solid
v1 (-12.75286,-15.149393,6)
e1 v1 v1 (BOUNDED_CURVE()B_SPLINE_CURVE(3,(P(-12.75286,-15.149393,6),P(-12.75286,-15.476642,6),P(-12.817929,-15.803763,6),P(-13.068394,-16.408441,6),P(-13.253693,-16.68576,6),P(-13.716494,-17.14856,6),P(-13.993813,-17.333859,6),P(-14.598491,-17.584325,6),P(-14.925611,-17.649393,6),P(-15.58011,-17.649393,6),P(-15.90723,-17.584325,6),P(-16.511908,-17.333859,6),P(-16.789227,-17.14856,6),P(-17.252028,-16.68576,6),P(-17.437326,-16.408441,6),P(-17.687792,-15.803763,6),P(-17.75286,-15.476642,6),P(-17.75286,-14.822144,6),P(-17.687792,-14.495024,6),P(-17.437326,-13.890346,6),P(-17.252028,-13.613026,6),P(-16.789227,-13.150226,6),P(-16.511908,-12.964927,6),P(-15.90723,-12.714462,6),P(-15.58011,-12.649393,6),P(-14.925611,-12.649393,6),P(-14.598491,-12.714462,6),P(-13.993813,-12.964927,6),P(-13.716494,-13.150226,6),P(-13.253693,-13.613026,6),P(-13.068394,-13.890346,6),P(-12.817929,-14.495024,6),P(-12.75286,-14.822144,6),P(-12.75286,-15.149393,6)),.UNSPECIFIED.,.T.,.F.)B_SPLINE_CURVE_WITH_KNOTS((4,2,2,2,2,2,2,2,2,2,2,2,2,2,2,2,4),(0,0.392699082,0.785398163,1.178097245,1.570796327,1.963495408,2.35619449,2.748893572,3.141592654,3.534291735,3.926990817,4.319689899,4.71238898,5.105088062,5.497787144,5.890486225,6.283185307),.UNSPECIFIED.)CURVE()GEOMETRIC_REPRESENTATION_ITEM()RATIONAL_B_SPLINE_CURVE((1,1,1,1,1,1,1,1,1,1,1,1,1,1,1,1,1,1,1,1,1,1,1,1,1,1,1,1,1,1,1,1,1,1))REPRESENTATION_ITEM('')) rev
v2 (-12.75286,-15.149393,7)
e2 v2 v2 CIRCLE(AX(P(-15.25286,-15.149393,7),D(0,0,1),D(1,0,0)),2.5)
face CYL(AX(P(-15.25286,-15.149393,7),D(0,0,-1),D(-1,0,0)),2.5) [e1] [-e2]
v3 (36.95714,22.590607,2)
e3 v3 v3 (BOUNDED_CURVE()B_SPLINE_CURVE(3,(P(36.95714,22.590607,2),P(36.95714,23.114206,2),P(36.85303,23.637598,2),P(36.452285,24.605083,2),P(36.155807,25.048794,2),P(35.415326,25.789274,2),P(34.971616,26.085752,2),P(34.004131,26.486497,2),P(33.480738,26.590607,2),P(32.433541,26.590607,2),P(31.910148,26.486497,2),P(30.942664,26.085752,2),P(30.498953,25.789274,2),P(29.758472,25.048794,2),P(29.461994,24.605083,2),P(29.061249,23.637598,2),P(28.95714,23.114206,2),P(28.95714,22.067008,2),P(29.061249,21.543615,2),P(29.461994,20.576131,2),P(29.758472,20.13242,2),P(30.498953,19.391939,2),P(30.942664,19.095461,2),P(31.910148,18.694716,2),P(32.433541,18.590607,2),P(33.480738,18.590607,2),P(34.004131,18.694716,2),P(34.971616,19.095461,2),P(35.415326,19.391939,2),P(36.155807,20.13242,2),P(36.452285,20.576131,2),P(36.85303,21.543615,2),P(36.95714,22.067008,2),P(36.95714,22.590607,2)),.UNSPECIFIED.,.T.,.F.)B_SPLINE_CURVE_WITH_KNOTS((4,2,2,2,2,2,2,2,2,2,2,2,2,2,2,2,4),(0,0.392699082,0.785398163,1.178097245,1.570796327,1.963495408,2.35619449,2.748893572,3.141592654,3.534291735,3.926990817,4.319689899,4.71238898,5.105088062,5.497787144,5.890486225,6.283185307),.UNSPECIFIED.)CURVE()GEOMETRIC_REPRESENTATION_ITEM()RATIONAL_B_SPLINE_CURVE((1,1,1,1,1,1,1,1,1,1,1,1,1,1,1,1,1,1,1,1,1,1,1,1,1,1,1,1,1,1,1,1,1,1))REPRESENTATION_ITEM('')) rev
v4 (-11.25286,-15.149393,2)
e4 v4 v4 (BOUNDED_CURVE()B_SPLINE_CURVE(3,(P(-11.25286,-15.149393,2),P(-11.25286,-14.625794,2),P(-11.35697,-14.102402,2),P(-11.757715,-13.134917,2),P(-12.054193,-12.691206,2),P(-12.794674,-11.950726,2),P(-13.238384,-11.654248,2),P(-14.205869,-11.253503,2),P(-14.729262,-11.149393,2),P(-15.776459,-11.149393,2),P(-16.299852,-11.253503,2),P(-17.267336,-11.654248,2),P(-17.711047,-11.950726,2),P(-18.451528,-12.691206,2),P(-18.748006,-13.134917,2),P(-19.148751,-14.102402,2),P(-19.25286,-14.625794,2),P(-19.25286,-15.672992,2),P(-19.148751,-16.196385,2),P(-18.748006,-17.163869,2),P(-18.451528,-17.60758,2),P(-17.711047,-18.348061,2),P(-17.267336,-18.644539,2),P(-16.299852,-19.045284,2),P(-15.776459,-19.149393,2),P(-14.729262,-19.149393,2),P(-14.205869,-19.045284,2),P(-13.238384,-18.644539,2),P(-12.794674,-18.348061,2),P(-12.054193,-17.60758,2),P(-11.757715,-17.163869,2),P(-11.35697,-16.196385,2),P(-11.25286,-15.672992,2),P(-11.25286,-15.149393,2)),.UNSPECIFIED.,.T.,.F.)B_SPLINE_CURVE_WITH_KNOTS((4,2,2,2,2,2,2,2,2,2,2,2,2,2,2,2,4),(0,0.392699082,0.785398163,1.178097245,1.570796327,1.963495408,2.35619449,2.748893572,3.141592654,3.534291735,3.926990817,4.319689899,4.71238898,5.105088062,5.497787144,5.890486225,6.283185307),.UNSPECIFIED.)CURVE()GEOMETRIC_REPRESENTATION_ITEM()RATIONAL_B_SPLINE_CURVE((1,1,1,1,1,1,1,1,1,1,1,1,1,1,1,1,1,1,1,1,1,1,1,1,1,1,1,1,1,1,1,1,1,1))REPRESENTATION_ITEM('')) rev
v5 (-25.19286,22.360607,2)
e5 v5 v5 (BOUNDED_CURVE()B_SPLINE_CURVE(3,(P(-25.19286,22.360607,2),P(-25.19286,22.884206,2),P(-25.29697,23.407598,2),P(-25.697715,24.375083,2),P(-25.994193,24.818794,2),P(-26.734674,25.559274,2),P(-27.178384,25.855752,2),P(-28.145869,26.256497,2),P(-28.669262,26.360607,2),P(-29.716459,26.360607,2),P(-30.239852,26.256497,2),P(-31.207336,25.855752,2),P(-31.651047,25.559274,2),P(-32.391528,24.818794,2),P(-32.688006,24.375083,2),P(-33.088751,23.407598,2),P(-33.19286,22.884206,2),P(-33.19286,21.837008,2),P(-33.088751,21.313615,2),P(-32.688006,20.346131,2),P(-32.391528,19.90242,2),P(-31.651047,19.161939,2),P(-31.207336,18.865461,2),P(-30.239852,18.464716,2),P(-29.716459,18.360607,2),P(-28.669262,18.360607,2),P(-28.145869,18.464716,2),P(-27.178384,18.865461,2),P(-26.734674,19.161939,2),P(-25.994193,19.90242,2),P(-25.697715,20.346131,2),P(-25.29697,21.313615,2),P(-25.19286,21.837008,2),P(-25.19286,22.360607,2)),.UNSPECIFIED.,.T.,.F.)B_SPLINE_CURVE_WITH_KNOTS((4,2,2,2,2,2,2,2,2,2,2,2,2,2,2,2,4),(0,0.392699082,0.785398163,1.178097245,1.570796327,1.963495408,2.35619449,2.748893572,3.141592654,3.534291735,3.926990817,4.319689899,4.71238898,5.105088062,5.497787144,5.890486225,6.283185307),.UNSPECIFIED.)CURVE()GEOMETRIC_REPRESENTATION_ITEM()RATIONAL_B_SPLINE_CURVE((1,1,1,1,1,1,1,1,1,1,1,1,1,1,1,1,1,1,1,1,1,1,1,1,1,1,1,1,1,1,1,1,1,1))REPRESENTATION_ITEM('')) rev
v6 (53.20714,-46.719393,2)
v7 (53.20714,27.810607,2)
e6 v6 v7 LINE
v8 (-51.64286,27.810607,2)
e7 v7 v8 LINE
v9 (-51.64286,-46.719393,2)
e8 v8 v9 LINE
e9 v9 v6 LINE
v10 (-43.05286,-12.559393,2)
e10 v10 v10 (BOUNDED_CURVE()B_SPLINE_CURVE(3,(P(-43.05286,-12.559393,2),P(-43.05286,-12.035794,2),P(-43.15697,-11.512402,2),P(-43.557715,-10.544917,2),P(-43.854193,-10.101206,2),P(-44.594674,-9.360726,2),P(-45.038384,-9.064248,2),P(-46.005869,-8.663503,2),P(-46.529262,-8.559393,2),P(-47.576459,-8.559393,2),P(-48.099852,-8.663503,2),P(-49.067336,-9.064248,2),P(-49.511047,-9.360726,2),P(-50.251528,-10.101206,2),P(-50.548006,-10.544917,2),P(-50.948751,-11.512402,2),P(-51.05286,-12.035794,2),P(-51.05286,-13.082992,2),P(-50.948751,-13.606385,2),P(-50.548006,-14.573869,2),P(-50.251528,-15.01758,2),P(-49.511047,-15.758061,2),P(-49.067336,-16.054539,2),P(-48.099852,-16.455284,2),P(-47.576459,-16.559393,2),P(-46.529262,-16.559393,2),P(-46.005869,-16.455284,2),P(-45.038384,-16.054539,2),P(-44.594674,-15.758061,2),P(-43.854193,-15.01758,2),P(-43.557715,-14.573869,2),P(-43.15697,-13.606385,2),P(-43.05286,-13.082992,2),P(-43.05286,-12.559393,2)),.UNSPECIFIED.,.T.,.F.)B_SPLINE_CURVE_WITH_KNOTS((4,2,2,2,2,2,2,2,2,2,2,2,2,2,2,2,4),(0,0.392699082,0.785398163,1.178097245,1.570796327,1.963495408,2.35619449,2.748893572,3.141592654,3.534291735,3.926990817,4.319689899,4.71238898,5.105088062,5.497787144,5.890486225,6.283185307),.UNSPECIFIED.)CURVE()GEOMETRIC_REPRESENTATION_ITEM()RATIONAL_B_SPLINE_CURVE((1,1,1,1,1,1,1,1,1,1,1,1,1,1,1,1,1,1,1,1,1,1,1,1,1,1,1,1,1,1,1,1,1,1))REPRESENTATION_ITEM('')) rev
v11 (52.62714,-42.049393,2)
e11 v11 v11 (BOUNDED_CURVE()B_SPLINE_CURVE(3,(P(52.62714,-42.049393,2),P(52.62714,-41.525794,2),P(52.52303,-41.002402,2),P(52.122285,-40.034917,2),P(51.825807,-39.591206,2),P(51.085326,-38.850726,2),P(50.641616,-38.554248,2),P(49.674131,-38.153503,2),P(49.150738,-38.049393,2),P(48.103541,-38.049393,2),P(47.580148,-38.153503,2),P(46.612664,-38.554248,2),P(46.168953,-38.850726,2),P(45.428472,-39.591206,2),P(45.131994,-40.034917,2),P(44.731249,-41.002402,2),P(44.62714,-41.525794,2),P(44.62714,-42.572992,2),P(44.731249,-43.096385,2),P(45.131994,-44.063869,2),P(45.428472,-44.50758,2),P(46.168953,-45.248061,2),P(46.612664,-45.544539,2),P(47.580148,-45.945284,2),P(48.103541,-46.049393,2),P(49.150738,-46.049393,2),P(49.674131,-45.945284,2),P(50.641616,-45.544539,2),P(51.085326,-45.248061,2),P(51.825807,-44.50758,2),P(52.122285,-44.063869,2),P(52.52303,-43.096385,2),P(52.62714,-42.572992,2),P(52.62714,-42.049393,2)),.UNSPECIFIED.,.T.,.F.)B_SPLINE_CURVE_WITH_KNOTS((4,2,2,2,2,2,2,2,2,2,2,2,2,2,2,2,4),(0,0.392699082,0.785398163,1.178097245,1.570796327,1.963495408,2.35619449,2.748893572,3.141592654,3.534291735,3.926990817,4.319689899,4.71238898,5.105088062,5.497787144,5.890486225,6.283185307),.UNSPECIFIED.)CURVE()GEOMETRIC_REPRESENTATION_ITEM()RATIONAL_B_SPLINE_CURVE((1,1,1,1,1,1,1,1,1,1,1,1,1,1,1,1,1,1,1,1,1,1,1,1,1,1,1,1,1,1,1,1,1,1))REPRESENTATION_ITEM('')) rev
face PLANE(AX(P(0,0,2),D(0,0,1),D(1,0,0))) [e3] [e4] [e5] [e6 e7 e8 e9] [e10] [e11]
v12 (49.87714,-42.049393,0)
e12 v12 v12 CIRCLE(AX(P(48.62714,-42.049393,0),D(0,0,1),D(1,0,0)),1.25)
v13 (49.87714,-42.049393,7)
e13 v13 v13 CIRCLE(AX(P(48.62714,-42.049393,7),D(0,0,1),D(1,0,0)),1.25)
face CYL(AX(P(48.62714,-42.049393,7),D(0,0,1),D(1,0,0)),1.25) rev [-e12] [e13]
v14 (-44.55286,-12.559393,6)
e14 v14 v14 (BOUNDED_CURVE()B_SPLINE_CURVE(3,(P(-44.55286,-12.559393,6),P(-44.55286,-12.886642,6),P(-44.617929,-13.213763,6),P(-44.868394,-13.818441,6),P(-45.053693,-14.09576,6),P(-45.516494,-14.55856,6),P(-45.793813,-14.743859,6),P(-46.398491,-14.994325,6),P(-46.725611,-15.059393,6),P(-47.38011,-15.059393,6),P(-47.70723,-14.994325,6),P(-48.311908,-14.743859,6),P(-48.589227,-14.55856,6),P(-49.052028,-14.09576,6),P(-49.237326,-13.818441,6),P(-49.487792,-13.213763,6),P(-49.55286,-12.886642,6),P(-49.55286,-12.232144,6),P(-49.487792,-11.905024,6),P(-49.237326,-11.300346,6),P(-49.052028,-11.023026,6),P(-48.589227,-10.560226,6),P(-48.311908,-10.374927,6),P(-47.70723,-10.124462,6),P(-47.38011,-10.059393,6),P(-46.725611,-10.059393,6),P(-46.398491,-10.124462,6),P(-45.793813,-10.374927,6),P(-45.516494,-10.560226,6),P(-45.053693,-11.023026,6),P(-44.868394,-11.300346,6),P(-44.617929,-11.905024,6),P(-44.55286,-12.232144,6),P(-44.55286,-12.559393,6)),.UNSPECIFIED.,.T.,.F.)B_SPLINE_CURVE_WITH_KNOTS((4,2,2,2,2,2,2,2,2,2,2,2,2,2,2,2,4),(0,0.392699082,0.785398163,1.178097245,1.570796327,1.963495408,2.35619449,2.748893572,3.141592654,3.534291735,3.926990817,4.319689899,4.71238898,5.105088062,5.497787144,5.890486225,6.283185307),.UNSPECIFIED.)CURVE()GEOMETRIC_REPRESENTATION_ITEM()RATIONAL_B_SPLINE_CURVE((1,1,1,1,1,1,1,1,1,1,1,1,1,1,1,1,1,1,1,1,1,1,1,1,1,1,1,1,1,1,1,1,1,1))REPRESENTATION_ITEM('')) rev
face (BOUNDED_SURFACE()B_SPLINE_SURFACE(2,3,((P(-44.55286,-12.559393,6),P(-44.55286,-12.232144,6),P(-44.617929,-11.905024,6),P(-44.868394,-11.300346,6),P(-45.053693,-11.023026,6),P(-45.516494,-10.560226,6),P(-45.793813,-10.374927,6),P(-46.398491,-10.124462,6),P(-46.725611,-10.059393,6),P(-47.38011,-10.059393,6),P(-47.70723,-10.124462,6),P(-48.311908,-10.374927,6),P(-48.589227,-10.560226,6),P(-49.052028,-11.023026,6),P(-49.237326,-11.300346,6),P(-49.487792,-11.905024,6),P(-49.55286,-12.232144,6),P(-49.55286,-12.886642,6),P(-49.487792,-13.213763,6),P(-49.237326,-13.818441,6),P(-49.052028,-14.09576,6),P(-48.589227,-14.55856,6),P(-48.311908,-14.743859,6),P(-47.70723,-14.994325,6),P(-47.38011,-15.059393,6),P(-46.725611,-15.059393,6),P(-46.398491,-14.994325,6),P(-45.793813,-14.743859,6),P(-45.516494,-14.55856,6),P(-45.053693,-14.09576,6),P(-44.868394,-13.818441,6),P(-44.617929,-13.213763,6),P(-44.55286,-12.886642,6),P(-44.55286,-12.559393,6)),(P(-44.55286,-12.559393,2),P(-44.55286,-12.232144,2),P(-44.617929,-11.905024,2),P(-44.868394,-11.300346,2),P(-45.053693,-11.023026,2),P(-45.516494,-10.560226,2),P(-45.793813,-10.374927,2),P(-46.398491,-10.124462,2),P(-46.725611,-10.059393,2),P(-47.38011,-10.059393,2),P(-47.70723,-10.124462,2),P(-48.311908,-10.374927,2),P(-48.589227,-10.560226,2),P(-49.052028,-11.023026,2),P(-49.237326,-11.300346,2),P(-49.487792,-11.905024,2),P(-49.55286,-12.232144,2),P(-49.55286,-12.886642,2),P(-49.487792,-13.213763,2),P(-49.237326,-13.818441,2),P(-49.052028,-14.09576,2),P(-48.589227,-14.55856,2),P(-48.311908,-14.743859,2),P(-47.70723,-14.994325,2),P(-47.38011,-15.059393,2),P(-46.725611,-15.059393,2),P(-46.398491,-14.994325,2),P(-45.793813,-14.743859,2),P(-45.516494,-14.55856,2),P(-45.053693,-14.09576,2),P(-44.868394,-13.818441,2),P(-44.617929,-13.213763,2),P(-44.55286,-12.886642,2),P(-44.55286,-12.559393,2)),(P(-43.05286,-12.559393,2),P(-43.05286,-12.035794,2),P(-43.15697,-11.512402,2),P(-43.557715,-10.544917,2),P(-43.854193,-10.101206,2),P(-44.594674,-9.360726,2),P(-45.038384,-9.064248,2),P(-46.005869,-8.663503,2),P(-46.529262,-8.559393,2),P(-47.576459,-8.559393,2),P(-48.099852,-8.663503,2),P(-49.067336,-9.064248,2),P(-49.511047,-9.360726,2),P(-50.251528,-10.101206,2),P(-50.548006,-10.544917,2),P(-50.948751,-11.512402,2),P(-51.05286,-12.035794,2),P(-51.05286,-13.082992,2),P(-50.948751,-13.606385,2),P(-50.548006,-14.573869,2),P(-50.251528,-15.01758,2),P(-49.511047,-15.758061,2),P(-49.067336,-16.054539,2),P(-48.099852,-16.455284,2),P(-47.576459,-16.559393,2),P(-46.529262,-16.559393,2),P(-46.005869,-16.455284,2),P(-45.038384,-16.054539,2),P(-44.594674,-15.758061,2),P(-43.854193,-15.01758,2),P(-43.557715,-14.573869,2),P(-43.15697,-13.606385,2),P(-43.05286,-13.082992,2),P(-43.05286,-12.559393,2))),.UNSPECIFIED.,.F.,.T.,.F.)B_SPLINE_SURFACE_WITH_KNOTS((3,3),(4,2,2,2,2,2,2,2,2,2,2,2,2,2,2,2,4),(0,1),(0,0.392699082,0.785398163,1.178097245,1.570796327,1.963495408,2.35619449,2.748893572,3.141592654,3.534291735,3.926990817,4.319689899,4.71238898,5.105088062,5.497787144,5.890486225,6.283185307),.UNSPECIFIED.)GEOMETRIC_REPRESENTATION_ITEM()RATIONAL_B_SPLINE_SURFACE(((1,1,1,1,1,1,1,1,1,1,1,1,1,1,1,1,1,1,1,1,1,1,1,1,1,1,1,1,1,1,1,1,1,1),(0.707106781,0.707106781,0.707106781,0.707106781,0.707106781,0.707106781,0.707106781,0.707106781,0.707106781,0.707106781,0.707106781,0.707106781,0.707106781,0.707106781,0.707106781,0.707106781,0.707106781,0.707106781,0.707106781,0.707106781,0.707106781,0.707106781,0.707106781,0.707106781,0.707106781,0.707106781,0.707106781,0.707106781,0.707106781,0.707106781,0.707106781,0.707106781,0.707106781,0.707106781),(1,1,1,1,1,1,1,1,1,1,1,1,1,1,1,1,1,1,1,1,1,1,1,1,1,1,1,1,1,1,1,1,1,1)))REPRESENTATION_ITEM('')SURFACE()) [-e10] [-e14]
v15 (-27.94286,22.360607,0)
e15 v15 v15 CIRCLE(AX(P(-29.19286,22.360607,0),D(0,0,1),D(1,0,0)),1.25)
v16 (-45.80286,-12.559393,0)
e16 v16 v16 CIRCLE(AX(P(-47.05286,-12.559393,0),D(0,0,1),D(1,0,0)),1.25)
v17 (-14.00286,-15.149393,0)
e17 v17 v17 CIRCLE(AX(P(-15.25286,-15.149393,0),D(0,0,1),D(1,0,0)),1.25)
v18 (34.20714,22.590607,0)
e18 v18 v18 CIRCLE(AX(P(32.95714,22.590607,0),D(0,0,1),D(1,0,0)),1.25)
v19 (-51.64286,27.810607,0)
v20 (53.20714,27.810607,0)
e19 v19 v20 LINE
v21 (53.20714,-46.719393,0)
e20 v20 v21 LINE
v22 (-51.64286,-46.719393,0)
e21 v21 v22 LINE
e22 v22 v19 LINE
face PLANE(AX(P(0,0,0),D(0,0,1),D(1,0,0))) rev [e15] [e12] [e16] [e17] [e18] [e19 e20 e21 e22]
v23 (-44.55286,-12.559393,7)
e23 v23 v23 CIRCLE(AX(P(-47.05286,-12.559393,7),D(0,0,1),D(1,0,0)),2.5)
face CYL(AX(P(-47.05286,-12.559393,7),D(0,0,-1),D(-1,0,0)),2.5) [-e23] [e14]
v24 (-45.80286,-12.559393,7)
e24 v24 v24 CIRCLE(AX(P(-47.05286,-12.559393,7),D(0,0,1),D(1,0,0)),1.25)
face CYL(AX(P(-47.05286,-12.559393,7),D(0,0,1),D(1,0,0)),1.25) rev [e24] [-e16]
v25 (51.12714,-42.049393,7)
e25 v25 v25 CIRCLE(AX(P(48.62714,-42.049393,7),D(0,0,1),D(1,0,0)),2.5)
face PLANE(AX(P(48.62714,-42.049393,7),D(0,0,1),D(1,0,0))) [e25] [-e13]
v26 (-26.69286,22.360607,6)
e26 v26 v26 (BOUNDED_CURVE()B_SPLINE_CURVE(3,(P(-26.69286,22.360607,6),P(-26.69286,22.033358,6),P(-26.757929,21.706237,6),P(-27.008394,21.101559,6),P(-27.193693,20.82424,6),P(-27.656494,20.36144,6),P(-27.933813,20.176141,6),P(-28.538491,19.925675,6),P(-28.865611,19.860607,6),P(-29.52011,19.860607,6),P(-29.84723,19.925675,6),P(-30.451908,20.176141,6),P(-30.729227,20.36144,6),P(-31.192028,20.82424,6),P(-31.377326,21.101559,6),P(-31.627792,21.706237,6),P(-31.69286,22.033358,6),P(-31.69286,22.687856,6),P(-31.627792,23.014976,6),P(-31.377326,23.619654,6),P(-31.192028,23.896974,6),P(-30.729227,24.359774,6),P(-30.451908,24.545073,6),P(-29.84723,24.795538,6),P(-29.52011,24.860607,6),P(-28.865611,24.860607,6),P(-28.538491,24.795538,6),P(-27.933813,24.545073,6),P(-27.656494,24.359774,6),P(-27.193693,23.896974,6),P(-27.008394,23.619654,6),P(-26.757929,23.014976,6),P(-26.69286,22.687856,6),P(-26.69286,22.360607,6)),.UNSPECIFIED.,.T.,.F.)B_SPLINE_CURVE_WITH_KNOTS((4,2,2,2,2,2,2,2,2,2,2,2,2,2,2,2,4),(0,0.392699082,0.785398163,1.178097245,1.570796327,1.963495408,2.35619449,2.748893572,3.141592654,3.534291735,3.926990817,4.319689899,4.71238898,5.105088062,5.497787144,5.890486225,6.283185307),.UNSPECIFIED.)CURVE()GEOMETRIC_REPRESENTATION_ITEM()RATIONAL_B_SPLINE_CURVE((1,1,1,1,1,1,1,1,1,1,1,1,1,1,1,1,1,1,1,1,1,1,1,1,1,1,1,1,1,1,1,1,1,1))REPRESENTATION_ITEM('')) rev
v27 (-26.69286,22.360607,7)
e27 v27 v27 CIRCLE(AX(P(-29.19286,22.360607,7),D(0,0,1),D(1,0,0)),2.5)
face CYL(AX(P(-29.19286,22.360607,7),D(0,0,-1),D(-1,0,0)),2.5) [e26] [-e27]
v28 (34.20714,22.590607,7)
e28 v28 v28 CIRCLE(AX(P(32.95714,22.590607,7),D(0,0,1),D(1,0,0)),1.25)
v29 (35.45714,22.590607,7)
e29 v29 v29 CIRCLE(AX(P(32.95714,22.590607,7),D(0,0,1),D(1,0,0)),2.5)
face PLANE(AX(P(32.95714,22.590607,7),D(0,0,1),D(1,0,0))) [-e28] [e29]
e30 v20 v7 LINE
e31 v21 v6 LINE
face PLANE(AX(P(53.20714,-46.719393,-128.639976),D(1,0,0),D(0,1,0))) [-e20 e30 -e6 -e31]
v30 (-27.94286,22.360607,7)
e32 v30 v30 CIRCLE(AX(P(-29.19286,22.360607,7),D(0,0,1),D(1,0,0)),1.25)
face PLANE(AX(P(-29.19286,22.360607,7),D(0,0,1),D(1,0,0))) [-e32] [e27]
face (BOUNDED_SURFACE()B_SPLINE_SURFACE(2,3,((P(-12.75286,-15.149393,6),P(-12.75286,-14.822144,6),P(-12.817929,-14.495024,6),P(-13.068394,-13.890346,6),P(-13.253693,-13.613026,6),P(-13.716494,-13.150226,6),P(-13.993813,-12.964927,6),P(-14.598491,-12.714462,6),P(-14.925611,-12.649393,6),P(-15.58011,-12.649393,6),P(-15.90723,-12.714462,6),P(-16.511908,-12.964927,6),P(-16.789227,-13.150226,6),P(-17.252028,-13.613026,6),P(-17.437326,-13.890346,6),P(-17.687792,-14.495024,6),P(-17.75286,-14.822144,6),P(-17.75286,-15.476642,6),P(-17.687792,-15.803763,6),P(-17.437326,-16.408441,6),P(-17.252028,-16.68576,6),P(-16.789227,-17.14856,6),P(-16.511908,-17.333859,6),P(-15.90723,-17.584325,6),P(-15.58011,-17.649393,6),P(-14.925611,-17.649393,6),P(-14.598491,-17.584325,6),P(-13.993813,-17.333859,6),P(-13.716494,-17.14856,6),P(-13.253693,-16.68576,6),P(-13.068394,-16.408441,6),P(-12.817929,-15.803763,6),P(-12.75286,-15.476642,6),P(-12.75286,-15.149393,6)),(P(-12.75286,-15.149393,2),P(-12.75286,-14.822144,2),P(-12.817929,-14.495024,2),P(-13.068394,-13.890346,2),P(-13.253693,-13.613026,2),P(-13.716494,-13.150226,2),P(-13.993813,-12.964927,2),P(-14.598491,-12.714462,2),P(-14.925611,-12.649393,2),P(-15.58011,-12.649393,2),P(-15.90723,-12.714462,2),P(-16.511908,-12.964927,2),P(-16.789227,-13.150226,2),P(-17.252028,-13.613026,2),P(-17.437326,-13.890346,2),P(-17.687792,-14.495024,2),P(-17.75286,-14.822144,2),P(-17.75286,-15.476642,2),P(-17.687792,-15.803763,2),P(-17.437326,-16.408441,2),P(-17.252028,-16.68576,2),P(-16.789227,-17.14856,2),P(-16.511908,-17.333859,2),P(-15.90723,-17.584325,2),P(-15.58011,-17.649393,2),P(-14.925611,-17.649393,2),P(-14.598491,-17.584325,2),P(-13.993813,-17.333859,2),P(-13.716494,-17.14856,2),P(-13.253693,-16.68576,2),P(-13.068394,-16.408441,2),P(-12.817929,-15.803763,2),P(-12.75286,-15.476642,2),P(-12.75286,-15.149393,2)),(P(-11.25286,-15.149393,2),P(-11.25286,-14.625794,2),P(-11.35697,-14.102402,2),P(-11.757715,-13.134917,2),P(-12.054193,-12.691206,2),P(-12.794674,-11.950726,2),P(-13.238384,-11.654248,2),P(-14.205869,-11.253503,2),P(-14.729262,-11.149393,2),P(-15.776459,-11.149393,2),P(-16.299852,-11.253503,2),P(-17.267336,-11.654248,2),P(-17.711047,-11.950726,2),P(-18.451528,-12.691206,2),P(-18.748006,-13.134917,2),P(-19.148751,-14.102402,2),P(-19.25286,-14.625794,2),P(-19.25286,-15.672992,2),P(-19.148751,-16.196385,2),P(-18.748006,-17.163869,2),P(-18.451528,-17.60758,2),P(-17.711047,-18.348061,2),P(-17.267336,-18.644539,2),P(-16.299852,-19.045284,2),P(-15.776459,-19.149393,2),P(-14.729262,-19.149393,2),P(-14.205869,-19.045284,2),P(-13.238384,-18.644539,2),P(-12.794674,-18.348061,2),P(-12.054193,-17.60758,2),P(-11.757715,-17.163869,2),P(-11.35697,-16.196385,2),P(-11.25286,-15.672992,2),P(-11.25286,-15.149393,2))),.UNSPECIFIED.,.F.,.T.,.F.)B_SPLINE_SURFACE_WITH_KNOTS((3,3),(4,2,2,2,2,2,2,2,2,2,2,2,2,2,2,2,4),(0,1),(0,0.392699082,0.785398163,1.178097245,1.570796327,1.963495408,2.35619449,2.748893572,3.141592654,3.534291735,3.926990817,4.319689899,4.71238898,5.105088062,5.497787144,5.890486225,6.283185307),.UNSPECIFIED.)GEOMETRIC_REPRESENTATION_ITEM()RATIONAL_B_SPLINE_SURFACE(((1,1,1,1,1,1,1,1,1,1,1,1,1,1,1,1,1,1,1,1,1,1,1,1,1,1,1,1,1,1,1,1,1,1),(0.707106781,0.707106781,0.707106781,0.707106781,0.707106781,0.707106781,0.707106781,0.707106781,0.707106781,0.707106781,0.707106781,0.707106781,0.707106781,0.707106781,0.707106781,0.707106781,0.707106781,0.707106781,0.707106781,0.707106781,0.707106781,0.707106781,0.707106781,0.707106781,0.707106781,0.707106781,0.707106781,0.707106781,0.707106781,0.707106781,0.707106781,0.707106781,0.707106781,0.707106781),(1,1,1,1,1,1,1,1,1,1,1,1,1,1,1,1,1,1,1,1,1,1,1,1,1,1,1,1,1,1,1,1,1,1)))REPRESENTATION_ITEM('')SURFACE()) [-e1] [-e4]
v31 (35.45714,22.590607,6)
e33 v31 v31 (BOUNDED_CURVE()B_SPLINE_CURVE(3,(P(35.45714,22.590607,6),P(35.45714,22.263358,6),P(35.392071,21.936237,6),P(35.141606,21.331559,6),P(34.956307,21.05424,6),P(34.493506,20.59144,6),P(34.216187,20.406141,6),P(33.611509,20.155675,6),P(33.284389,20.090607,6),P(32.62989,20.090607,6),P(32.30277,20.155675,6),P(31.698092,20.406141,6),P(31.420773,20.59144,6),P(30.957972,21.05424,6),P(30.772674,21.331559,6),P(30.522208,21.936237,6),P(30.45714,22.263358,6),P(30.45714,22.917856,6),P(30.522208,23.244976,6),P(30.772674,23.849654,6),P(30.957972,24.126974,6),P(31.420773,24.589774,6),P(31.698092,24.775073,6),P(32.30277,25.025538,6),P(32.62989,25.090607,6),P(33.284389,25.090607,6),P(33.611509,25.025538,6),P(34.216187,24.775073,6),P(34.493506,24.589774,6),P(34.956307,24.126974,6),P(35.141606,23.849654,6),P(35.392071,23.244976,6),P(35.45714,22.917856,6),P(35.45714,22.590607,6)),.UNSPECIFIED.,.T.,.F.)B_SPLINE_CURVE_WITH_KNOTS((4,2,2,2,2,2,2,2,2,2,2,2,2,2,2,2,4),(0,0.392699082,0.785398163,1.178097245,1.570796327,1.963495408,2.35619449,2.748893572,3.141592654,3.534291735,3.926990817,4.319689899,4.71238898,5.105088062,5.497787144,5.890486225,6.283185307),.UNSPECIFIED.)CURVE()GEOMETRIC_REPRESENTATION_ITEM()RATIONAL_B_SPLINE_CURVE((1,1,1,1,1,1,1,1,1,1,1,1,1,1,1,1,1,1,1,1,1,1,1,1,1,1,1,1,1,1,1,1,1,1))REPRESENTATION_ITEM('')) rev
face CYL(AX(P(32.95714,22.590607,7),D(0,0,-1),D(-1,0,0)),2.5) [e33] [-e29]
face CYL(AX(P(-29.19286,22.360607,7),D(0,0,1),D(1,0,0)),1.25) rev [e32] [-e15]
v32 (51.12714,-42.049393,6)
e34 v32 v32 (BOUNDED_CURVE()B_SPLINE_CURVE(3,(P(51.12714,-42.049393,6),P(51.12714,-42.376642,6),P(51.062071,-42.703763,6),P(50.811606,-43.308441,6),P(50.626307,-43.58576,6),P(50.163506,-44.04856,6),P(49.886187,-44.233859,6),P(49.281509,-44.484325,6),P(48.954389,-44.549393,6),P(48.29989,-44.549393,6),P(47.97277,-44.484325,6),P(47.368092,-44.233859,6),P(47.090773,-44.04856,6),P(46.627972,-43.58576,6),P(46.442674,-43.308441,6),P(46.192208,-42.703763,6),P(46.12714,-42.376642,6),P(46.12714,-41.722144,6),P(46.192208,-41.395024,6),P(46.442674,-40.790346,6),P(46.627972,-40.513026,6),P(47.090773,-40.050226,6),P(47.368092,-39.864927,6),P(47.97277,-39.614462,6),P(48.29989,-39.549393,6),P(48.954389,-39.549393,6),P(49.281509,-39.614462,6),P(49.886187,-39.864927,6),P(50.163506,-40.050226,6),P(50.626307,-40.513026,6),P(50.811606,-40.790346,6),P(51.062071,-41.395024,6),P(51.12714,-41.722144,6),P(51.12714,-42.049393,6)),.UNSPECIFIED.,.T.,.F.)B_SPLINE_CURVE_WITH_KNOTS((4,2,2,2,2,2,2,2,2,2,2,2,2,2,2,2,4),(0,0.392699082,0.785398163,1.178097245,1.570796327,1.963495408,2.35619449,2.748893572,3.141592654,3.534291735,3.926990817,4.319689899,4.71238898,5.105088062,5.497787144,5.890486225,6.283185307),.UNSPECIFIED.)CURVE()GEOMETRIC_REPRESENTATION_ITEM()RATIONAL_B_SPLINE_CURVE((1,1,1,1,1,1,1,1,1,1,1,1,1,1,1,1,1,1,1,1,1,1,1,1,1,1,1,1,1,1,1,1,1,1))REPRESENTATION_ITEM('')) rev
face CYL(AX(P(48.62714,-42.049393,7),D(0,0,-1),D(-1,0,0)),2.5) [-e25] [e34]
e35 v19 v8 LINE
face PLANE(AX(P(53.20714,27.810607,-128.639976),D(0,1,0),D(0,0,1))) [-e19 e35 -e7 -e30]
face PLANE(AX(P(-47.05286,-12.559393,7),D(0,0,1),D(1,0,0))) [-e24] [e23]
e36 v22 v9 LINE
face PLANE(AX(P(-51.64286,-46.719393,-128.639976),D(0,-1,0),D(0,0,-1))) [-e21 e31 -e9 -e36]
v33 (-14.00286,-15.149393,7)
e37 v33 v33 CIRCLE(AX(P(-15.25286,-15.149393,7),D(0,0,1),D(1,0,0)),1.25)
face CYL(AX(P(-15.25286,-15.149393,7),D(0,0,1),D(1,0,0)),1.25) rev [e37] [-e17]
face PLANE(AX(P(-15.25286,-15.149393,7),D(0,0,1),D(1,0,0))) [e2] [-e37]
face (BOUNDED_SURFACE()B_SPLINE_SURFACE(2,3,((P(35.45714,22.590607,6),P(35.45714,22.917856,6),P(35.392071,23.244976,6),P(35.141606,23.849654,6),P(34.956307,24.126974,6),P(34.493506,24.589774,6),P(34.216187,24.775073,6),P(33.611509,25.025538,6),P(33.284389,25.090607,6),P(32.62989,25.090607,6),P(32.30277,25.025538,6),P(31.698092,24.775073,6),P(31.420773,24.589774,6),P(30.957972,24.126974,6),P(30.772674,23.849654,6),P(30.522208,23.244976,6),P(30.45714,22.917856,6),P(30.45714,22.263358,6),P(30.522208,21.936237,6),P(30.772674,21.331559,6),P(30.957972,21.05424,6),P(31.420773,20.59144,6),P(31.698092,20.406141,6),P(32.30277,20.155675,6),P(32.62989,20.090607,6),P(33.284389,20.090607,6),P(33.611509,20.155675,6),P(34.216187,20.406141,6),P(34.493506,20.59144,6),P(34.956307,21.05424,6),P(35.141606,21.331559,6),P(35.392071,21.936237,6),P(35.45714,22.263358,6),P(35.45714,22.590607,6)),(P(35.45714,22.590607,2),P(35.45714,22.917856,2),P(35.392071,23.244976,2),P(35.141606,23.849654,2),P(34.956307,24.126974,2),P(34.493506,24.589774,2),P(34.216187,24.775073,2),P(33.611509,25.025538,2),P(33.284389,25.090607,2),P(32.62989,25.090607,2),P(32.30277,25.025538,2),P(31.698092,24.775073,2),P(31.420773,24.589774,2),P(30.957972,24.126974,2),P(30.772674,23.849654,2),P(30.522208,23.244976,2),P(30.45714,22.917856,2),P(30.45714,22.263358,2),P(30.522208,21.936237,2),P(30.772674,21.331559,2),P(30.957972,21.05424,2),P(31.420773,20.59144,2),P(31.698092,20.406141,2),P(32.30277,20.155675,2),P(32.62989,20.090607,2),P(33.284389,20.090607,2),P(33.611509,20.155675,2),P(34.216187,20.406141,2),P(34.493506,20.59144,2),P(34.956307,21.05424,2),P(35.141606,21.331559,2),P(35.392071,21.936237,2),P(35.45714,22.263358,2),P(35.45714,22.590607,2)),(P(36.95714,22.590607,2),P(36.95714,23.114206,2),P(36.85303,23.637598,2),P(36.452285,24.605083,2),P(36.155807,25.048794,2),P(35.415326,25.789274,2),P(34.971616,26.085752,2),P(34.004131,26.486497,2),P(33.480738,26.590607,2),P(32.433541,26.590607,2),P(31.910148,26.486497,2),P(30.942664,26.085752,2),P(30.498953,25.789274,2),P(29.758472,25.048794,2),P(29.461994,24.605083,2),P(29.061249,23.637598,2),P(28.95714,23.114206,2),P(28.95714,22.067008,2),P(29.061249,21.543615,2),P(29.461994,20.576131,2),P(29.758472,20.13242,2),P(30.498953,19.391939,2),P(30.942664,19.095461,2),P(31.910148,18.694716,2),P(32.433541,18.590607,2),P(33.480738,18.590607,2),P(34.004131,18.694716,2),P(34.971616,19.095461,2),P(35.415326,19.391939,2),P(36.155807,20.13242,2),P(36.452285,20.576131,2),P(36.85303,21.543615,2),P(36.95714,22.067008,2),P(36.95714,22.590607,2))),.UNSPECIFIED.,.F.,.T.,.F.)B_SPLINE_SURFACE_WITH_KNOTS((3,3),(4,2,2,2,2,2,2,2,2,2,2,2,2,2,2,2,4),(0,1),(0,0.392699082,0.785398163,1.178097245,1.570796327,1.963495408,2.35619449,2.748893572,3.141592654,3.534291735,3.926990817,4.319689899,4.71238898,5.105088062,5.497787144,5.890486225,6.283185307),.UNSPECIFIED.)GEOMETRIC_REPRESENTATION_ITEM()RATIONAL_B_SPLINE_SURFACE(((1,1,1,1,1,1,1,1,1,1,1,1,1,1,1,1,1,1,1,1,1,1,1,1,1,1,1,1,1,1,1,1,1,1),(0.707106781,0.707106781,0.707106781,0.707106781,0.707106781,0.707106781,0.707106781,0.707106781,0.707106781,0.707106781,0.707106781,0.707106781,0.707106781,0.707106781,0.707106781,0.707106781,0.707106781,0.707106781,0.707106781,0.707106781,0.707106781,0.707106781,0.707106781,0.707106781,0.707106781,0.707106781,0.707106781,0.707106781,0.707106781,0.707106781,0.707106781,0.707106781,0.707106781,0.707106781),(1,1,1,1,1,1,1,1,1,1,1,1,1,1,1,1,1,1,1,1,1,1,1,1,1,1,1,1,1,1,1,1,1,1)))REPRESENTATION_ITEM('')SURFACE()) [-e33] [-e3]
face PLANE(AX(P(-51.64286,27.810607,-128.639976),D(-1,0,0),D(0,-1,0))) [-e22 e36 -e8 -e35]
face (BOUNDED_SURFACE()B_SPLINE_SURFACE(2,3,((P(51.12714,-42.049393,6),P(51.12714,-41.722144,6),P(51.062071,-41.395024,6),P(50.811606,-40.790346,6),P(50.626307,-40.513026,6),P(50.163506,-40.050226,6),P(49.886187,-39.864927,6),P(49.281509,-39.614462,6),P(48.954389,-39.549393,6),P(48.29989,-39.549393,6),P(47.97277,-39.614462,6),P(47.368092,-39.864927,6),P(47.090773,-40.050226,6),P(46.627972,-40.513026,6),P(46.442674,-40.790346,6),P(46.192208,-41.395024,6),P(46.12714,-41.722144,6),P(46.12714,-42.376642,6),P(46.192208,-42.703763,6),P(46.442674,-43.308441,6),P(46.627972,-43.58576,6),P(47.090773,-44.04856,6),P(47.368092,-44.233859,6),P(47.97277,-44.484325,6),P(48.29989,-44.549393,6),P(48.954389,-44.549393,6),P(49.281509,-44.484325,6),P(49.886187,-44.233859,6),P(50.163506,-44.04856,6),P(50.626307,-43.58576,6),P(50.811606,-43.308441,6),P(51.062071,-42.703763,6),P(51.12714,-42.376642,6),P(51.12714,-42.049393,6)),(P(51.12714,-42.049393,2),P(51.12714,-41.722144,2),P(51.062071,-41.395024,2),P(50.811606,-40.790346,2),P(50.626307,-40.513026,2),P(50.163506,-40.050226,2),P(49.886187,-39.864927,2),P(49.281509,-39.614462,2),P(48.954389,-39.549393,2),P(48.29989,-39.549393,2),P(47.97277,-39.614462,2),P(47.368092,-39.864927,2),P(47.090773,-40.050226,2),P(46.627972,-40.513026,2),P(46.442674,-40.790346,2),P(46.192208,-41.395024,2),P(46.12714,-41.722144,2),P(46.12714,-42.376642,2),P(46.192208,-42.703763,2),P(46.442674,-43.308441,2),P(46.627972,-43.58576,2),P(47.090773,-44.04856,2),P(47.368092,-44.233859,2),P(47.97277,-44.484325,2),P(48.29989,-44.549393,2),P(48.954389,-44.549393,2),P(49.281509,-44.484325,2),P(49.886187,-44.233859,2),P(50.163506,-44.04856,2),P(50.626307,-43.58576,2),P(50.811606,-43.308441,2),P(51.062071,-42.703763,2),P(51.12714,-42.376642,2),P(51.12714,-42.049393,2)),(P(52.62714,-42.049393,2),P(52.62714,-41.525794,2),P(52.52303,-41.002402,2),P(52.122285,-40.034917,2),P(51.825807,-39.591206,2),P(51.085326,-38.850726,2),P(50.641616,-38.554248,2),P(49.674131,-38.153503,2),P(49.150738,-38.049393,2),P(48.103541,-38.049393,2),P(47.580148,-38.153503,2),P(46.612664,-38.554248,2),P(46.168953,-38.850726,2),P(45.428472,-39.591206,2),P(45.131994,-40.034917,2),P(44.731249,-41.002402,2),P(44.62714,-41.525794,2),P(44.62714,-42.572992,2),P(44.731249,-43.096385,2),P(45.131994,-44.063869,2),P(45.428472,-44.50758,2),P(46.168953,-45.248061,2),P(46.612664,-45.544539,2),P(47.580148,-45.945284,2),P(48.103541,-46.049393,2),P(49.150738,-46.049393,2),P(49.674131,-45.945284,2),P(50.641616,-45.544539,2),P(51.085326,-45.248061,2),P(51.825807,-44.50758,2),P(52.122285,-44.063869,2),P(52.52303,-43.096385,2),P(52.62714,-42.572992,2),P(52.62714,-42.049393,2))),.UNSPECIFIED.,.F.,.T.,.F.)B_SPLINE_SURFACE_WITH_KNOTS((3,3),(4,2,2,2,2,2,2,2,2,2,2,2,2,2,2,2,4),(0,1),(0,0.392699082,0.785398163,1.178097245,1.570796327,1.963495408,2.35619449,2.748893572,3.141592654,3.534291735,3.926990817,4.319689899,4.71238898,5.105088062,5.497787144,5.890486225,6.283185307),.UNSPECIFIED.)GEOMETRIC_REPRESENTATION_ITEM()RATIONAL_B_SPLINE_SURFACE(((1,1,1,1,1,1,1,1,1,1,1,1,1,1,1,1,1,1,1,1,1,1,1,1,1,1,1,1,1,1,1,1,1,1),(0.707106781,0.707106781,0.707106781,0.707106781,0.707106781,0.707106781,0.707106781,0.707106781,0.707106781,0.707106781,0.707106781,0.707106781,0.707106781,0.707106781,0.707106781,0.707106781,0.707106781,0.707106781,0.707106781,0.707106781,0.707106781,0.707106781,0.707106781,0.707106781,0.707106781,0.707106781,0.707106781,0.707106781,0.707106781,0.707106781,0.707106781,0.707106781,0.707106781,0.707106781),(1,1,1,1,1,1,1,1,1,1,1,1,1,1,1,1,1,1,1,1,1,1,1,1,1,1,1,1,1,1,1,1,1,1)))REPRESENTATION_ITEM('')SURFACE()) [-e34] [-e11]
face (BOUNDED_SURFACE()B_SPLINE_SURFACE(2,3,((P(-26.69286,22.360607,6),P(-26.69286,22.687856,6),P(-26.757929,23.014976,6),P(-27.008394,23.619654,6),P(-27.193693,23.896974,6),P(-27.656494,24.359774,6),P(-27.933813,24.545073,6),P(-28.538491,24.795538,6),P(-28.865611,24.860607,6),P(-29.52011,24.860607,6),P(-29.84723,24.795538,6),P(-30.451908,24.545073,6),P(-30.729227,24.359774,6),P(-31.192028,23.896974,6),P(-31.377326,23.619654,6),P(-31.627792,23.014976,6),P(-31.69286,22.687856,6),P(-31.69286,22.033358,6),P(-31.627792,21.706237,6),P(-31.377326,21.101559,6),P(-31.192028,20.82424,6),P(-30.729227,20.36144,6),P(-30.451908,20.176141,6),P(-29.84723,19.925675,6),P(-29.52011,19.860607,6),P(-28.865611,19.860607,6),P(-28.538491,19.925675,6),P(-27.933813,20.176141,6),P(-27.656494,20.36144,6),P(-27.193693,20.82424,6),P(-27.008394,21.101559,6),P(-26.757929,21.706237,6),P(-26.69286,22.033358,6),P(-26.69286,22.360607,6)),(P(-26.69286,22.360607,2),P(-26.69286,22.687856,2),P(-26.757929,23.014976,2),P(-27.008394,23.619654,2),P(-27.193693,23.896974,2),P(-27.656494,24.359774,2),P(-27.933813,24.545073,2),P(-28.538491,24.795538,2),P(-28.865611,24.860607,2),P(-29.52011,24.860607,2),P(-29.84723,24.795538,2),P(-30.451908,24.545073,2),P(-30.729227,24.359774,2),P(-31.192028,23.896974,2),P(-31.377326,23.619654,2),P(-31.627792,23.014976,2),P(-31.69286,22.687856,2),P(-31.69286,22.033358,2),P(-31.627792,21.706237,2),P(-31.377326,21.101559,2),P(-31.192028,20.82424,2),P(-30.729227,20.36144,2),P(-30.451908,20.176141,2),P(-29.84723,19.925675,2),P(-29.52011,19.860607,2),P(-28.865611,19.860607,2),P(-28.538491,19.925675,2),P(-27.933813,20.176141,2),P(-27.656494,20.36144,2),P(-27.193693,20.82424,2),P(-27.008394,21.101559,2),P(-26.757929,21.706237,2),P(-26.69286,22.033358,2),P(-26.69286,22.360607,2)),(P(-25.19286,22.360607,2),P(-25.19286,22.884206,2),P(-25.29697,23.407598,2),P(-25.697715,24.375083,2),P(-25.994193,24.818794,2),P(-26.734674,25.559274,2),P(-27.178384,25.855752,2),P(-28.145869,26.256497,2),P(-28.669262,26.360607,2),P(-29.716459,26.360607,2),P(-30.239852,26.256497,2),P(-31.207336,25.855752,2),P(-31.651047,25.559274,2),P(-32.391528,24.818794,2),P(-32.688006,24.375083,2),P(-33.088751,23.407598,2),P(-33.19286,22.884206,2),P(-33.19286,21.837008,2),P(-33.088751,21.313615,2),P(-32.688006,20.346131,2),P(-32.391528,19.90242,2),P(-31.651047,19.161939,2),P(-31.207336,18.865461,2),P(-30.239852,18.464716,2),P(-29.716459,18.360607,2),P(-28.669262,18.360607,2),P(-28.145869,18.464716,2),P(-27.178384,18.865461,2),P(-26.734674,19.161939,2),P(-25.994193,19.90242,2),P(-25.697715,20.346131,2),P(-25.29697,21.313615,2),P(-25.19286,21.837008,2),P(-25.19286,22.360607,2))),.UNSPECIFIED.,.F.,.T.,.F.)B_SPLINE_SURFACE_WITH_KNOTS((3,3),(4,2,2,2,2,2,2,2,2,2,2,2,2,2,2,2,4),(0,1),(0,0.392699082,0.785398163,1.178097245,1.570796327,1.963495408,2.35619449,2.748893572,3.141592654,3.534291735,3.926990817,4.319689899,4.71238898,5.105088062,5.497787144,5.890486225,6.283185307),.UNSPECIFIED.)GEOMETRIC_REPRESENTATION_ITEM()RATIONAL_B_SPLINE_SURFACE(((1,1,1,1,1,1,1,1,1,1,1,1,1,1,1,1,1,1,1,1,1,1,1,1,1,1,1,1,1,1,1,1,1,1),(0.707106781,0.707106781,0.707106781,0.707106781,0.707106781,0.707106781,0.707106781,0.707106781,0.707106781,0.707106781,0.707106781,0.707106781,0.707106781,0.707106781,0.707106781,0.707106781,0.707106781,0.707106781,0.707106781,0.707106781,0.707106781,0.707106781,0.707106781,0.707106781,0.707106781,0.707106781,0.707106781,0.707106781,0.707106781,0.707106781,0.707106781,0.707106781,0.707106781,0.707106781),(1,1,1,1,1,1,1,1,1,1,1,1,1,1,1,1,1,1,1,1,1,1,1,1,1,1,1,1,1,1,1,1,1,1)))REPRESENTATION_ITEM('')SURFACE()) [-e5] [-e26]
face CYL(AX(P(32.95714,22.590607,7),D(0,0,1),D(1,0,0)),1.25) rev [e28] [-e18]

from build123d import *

# Parameters (mm, degrees)
SKETCH1_W           = 100.85
SKETCH1_H           = 70.53
BOSS_EXTRUDE1_DEPTH = 2
SKETCH6_W           = 104.85
SKETCH6_H           = 74.53
BOSS_EXTRUDE3_DEPTH = 2
SKETCH3_R           = 2.5
BOSS_EXTRUDE2_DEPTH = 5
FILLET1_SIZE        = 1.5
FILLET1_SIZE_2      = 4


with BuildPart() as part:
    # Sketch1 → Boss-Extrude1 (new body)
    with BuildSketch(Plane.XY):
        with Locations((0.782139599, -9.454393248)):
            Rectangle(SKETCH1_W, SKETCH1_H)
    extrude(amount=BOSS_EXTRUDE1_DEPTH)

    # Sketch6 → Boss-Extrude3 (add)
    with BuildSketch(Plane.XY.offset(2)):
        with Locations((0.782139599, -9.454393248)):
            Rectangle(SKETCH6_W, SKETCH6_H)
    extrude(amount=-BOSS_EXTRUDE3_DEPTH)

    # Sketch3 → Boss-Extrude2 (add)
    with BuildSketch(Plane.XY.offset(2)):
        with Locations((-29.192860401, 22.360606752)):
            Circle(SKETCH3_R)
    boss_extrude2 = extrude(amount=BOSS_EXTRUDE2_DEPTH)

    # Sketch5 → Tap Drill for M3x0.5 Tap1 (revolve, cut)
    with BuildSketch(Plane(origin=(-29.192860401, 22.360606752, 7), x_dir=(0, -1, 0), z_dir=(1, 0, 0))):
        Polygon((0, 0), (0, 10.751075774), (1.25, 10), (1.25, 0), align=None)
    tap_drill_for_m3x0_5_tap1 = revolve(axis=Axis((-29.192860401, 22.360606752, 13.35), (0, 0, -1)), mode=Mode.SUBTRACT)

    # Sketch-Pattern1: Boss-Extrude2, Tap Drill for M3x0.5 Tap1 at 4 more places
    with Locations((-17.86, -34.92, 0), (13.94, -37.51, 0), (77.82, -64.41, 0), (62.15, 0.23, 0)):
        add(boss_extrude2)
        add(tap_drill_for_m3x0_5_tap1, mode=Mode.SUBTRACT)

    # Fillet1
    # an asymmetric fillet: 4, 1.5 mm, written as the material it adds along each edge
    with BuildSketch(Plane(origin=(-29.192860401, 22.360606752, 2), x_dir=(1, 0, 0), z_dir=(0, -1, 0))) as fillet1_piece_1:
        with BuildLine():
            Bezier((2.5 + FILLET1_SIZE, 0), (2.5, 0), (2.5, FILLET1_SIZE_2), weights=[1, 0.707106781, 1])
            Line((2.5, FILLET1_SIZE_2), (2.5, 0))
            Line((2.5, 0), (2.5 + FILLET1_SIZE, 0))
        make_face()
    revolve(axis=Axis((-29.192860401, 22.360606752, 2), (0, 0, 1)))
    with BuildSketch(Plane(origin=(-47.052860401, -12.559393248, 2), x_dir=(1, 0, 0), z_dir=(0, -1, 0))) as fillet1_piece_2:
        with BuildLine():
            Bezier((2.5 + FILLET1_SIZE, 0), (2.5, 0), (2.5, FILLET1_SIZE_2), weights=[1, 0.707106781, 1])
            Line((2.5, FILLET1_SIZE_2), (2.5, 0))
            Line((2.5, 0), (2.5 + FILLET1_SIZE, 0))
        make_face()
    revolve(axis=Axis((-47.052860401, -12.559393248, 2), (0, 0, 1)))
    with BuildSketch(Plane(origin=(-15.252860401, -15.149393248, 2), x_dir=(1, 0, 0), z_dir=(0, -1, 0))) as fillet1_piece_3:
        with BuildLine():
            Bezier((2.5 + FILLET1_SIZE, 0), (2.5, 0), (2.5, FILLET1_SIZE_2), weights=[1, 0.707106781, 1])
            Line((2.5, FILLET1_SIZE_2), (2.5, 0))
            Line((2.5, 0), (2.5 + FILLET1_SIZE, 0))
        make_face()
    revolve(axis=Axis((-15.252860401, -15.149393248, 2), (0, 0, 1)))
    with BuildSketch(Plane(origin=(48.627139599, -42.049393248, 2), x_dir=(1, 0, 0), z_dir=(0, -1, 0))) as fillet1_piece_4:
        with BuildLine():
            Bezier((2.5 + FILLET1_SIZE, 0), (2.5, 0), (2.5, FILLET1_SIZE_2), weights=[1, 0.707106781, 1])
            Line((2.5, FILLET1_SIZE_2), (2.5, 0))
            Line((2.5, 0), (2.5 + FILLET1_SIZE, 0))
        make_face()
    revolve(axis=Axis((48.627139599, -42.049393248, 2), (0, 0, 1)))
    with BuildSketch(Plane(origin=(32.957139599, 22.590606752, 2), x_dir=(1, 0, 0), z_dir=(0, -1, 0))) as fillet1_piece_5:
        with BuildLine():
            Bezier((2.5 + FILLET1_SIZE, 0), (2.5, 0), (2.5, FILLET1_SIZE_2), weights=[1, 0.707106781, 1])
            Line((2.5, FILLET1_SIZE_2), (2.5, 0))
            Line((2.5, 0), (2.5 + FILLET1_SIZE, 0))
        make_face()
    revolve(axis=Axis((32.957139599, 22.590606752, 2), (0, 0, 1)))


solid = part.part
